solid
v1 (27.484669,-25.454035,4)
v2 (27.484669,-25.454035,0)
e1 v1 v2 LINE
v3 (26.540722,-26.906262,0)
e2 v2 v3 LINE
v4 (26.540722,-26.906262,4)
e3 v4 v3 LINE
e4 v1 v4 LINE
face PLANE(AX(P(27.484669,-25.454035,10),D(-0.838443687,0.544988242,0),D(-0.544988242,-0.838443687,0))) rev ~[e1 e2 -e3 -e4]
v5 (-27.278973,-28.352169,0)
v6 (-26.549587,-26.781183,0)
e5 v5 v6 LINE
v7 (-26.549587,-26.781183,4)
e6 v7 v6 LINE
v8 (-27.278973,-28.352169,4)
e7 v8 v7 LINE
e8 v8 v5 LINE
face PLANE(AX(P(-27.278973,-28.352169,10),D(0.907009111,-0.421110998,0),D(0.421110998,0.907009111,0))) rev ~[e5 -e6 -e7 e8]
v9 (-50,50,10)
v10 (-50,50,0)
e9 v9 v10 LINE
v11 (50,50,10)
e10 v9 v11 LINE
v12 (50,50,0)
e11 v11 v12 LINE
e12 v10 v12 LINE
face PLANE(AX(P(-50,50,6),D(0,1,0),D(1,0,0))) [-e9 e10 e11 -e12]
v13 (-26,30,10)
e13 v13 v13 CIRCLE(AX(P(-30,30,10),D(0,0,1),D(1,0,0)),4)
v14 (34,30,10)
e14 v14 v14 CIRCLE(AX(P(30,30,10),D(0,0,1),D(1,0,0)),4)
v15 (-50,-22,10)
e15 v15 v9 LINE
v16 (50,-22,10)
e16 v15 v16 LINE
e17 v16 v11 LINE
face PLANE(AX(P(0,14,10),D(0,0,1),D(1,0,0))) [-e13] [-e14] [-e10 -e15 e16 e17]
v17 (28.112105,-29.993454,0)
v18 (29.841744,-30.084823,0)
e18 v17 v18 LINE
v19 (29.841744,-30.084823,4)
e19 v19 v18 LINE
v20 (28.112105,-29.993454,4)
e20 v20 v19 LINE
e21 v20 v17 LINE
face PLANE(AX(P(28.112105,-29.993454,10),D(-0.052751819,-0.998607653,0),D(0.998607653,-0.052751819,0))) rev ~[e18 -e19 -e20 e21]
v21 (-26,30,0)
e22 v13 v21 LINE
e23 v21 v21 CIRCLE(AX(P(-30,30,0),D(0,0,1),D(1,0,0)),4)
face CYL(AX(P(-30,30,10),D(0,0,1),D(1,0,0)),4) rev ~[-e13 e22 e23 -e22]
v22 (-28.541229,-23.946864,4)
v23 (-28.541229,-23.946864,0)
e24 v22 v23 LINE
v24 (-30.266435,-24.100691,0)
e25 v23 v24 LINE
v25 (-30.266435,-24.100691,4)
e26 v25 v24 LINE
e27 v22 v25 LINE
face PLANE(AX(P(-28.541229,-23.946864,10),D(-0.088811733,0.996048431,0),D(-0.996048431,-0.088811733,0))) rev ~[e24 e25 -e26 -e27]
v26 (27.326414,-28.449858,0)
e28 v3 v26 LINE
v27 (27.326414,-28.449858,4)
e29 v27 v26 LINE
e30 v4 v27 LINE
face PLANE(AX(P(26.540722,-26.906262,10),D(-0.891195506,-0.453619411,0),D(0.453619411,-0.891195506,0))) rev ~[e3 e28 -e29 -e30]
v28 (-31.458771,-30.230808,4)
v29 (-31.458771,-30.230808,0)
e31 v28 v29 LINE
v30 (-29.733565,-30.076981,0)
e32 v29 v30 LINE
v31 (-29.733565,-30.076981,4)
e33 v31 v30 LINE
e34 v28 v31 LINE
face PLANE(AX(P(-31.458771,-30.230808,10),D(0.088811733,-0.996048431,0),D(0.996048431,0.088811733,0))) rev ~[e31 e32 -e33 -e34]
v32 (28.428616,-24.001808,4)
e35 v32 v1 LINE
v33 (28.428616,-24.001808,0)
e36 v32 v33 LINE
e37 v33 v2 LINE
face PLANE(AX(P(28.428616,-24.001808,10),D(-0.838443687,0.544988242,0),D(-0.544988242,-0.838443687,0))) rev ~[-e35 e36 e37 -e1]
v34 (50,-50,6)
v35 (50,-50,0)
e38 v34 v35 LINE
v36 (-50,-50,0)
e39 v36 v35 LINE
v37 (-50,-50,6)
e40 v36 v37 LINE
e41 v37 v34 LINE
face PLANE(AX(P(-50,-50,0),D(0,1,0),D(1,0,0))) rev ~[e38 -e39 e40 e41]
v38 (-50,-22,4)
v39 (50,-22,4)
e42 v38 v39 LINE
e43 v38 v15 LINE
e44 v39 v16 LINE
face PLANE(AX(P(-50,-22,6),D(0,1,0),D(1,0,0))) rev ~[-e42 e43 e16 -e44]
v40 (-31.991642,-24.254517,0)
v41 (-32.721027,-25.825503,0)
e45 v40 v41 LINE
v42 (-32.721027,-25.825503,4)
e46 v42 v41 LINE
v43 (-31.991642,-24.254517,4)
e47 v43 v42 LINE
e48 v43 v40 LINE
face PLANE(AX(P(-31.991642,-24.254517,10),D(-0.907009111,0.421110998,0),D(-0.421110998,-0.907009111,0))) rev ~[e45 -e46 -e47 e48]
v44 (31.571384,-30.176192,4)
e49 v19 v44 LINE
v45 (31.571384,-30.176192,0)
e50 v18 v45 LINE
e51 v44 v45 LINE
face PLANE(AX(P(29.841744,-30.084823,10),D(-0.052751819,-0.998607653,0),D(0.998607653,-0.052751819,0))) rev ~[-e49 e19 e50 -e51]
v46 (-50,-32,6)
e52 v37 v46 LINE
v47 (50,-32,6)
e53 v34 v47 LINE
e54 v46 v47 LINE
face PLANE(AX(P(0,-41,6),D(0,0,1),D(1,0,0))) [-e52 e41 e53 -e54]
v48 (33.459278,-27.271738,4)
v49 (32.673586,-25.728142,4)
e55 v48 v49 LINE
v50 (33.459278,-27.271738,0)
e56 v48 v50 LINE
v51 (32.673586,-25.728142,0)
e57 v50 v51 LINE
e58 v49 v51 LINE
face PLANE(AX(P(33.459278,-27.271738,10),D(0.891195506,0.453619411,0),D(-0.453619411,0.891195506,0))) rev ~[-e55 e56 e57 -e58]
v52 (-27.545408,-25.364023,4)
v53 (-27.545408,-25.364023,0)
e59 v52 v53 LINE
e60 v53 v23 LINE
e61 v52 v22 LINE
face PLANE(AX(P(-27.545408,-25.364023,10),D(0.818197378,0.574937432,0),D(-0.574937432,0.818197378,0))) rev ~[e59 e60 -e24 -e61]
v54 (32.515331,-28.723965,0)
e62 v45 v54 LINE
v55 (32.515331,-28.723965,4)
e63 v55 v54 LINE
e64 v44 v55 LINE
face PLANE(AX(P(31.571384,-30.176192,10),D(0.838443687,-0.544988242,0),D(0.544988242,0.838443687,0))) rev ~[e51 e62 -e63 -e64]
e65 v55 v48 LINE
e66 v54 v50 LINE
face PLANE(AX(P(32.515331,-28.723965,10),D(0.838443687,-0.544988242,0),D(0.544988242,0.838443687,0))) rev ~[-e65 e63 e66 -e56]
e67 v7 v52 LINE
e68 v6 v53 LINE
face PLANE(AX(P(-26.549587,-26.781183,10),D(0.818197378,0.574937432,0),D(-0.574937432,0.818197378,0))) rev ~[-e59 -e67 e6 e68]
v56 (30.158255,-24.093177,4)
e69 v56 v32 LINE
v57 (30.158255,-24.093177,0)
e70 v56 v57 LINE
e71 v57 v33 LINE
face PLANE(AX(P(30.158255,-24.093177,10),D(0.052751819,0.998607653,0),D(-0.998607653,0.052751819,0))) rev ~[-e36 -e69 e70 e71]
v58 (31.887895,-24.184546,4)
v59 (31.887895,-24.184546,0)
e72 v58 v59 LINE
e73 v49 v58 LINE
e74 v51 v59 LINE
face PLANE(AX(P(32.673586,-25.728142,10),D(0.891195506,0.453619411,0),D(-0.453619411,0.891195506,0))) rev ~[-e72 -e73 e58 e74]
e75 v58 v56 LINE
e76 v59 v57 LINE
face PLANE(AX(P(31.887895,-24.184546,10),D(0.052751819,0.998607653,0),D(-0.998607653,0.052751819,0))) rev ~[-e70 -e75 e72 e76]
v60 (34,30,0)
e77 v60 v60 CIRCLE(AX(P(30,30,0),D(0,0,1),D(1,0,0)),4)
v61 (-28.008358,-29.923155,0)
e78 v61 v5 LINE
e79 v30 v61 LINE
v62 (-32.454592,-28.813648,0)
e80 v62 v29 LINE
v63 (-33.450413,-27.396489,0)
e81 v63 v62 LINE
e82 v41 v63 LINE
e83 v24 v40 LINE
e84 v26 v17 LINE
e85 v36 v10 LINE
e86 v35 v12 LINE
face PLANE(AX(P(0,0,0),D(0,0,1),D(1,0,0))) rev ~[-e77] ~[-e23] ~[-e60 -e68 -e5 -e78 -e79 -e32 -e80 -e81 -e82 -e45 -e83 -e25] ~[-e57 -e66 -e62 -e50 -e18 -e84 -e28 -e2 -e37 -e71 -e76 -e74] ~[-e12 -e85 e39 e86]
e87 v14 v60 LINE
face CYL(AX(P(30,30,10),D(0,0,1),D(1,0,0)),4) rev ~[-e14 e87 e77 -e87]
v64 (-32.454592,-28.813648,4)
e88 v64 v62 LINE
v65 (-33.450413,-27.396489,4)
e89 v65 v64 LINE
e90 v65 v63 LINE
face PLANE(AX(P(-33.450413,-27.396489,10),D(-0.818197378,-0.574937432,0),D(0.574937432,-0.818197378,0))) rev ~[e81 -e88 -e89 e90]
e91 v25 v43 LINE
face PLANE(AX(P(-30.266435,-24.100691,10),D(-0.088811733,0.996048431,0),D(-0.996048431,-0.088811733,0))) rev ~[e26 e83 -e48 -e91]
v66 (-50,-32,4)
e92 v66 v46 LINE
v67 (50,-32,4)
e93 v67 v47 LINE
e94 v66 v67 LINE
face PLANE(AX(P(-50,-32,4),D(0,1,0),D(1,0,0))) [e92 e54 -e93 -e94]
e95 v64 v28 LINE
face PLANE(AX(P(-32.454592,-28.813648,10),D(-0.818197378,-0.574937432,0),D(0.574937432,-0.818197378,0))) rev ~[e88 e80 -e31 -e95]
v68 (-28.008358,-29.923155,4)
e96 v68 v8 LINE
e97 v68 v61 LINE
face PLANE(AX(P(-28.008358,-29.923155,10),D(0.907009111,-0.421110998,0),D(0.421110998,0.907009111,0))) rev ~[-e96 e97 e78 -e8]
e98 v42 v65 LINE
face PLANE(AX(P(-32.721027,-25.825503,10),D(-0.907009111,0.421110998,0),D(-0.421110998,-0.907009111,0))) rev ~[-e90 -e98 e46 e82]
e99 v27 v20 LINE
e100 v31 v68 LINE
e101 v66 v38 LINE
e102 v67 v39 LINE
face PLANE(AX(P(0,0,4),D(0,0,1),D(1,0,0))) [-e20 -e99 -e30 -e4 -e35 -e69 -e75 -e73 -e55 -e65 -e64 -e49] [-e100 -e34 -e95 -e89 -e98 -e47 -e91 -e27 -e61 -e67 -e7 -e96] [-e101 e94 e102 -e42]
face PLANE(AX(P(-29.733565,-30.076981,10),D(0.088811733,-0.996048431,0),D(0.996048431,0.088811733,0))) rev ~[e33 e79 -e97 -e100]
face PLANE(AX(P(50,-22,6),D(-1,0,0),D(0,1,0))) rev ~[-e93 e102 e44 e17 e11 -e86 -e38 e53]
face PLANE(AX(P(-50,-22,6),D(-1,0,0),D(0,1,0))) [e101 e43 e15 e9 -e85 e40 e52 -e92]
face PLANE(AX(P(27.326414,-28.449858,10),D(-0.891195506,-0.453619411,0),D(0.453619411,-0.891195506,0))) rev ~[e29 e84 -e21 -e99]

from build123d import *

# Parameters (mm, degrees)
F0_W     = 100
F0_H     = 100
F1_DEPTH = 4
F2_W     = 100
F2_H     = 72
F2_H_2   = 18
F3_DEPTH = 2
F4_W     = 100
F4_H     = 72
F5_DEPTH = 4
F6_R     = 4
F7_DEPTH = 25


with BuildPart() as f1:
    # F0 (on Top) → F1 (new body)
    with BuildSketch(Plane.XY):
        Rectangle(F0_W, F0_H)
    extrude(amount=F1_DEPTH)

    # F2 (on face) → F3 (join)
    with BuildSketch(Plane.XY.offset(4)):
        with Locations((0, 14)):
            Rectangle(F2_W, F2_H)
        with Locations((0, -41)):
            Rectangle(F2_W, F2_H_2)
    extrude(amount=F3_DEPTH)

    # F4 (on face) → F5 (join)
    with BuildSketch(Plane.XY.offset(6)):
        with Locations((0, 14)):
            Rectangle(F4_W, F4_H)
    extrude(amount=F5_DEPTH)

    # F6 (on face) → F7 (cut)
    with BuildSketch(Plane.XY.offset(10)):
        with Locations((30, 30)):
            Circle(F6_R)
        with Locations((-30, 30)):
            Circle(F6_R)
        with BuildLine():
            ThreePointArc((-27.2789726301, -28.3521687498), (-27.0705732549, -27.7357198631), (-27, -27.0888358355))
            ThreePointArc((-27, -27.0888358355), (-27.1396000204, -26.1843404199), (-27.5454079712, -25.3640233899))
            ThreePointArc((-27.5454079712, -25.3640233899), (-28.7366669855, -24.3678085121), (-30.2664349753, -24.1006905237))
            ThreePointArc((-30.2664349753, -24.1006905237), (-31.7248121898, -24.634243627), (-32.721027317, -25.8255028072))
            ThreePointArc((-32.721027317, -25.8255028072), (-32.9881452887, -27.3552710687), (-32.4545920728, -28.8136482183))
            ThreePointArc((-32.4545920728, -28.8136482183), (-31.2633329265, -29.8098631997), (-29.7335647552, -30.0769811231))
            ThreePointArc((-29.7335647552, -30.0769811231), (-28.2751876481, -29.54342793), (-27.2789726301, -28.3521687498))
        make_face()
        with BuildLine():
            ThreePointArc((-27.5454079712, -25.3640233899), (-27.1396000204, -26.1843404199), (-27, -27.0888358355))
            ThreePointArc((-27, -27.0888358355), (-27.0705732549, -27.7357198631), (-27.2789726301, -28.3521687498))
            Line((-27.2789726301, -28.3521687498), (-26.5495870229, -26.7811829673))
            Line((-26.5495870229, -26.7811829673), (-27.5454079712, -25.3640233899))
        make_face()
        with BuildLine():
            ThreePointArc((-30.2664349753, -24.1006905237), (-28.7366669855, -24.3678085121), (-27.5454079712, -25.3640233899))
            Line((-27.5454079712, -25.3640233899), (-28.5412287108, -23.9468641096))
            Line((-28.5412287108, -23.9468641096), (-30.2664349753, -24.1006905237))
        make_face()
        with BuildLine():
            Line((-28.0083583121, -29.9231546931), (-27.2789726301, -28.3521687498))
            ThreePointArc((-27.2789726301, -28.3521687498), (-28.2751876481, -29.54342793), (-29.7335647552, -30.0769811231))
            Line((-29.7335647552, -30.0769811231), (-28.0083583121, -29.9231546931))
        make_face()
        with BuildLine():
            ThreePointArc((-32.721027317, -25.8255028072), (-31.7248121898, -24.634243627), (-30.2664349753, -24.1006905237))
            Line((-30.2664349753, -24.1006905237), (-31.9916416879, -24.2545169778))
            Line((-31.9916416879, -24.2545169778), (-32.721027317, -25.8255028072))
        make_face()
        with BuildLine():
            Line((-31.4587712892, -30.2308075613), (-29.7335647552, -30.0769811231))
            ThreePointArc((-29.7335647552, -30.0769811231), (-31.2633329265, -29.8098631997), (-32.4545920728, -28.8136482183))
            Line((-32.4545920728, -28.8136482183), (-31.4587712892, -30.2308075613))
        make_face()
        with BuildLine():
            ThreePointArc((-32.4545920728, -28.8136482183), (-32.9881452887, -27.3552710687), (-32.721027317, -25.8255028072))
            Line((-32.721027317, -25.8255028072), (-33.4504129771, -27.3964887036))
            Line((-33.4504129771, -27.3964887036), (-32.4545920728, -28.8136482183))
        make_face()
        with BuildLine():
            ThreePointArc((32.5153308801, -28.7239650037), (32.876281683, -27.9416451078), (33, -27.089))
            ThreePointArc((33, -27.089), (32.9172554923, -26.3892712006), (32.6735864049, -25.7281415445))
            ThreePointArc((32.6735864049, -25.7281415445), (31.6349646218, -24.5736688716), (30.1582554561, -24.0931770395))
            ThreePointArc((30.1582554561, -24.0931770395), (28.6391417683, -24.4154134812), (27.4846689431, -25.4540352683))
            ThreePointArc((27.4846689431, -25.4540352683), (27.0041770385, -26.9307445628), (27.3264135035, -28.4498582753))
            ThreePointArc((27.3264135035, -28.4498582753), (28.365035239, -29.6043310379), (29.8417444141, -30.0848229536))
            ThreePointArc((29.8417444141, -30.0848229536), (31.3608580292, -29.7625866218), (32.5153308801, -28.7239650037))
        make_face()
        with BuildLine():
            ThreePointArc((32.6735864049, -25.7281415445), (32.9172554923, -26.3892712006), (33, -27.089))
            ThreePointArc((33, -27.089), (32.876281683, -27.9416451078), (32.5153308801, -28.7239650037))
            Line((32.5153308801, -28.7239650037), (33.4592783853, -27.2717376616))
            Line((33.4592783853, -27.2717376616), (32.6735864049, -25.7281415445))
        make_face()
        with BuildLine():
            ThreePointArc((30.1582554561, -24.0931770395), (31.6349646218, -24.5736688716), (32.6735864049, -25.7281415445))
            Line((32.6735864049, -25.7281415445), (31.8878946499, -24.1845458704))
            Line((31.8878946499, -24.1845458704), (30.1582554561, -24.0931770395))
        make_face()
        with BuildLine():
            Line((31.5713837355, -30.1761917913), (32.5153308801, -28.7239650037))
            ThreePointArc((32.5153308801, -28.7239650037), (31.3608580292, -29.7625866218), (29.8417444141, -30.0848229536))
            Line((29.8417444141, -30.0848229536), (31.5713837355, -30.1761917913))
        make_face()
        with BuildLine():
            ThreePointArc((27.4846689431, -25.4540352683), (28.6391417683, -24.4154134812), (30.1582554561, -24.0931770395))
            Line((30.1582554561, -24.0931770395), (28.4286162645, -24.0018082087))
            Line((28.4286162645, -24.0018082087), (27.4846689431, -25.4540352683))
        make_face()
        with BuildLine():
            Line((28.1121053501, -29.9934541296), (29.8417444141, -30.0848229536))
            ThreePointArc((29.8417444141, -30.0848229536), (28.365035239, -29.6043310379), (27.3264135035, -28.4498582753))
            Line((27.3264135035, -28.4498582753), (28.1121053501, -29.9934541296))
        make_face()
        with BuildLine():
            ThreePointArc((27.3264135035, -28.4498582753), (27.0041770385, -26.9307445628), (27.4846689431, -25.4540352683))
            Line((27.4846689431, -25.4540352683), (26.5407216147, -26.9062623384))
            Line((26.5407216147, -26.9062623384), (27.3264135035, -28.4498582753))
        make_face()
    extrude(amount=-F7_DEPTH, mode=Mode.SUBTRACT)


solid = f1.part
